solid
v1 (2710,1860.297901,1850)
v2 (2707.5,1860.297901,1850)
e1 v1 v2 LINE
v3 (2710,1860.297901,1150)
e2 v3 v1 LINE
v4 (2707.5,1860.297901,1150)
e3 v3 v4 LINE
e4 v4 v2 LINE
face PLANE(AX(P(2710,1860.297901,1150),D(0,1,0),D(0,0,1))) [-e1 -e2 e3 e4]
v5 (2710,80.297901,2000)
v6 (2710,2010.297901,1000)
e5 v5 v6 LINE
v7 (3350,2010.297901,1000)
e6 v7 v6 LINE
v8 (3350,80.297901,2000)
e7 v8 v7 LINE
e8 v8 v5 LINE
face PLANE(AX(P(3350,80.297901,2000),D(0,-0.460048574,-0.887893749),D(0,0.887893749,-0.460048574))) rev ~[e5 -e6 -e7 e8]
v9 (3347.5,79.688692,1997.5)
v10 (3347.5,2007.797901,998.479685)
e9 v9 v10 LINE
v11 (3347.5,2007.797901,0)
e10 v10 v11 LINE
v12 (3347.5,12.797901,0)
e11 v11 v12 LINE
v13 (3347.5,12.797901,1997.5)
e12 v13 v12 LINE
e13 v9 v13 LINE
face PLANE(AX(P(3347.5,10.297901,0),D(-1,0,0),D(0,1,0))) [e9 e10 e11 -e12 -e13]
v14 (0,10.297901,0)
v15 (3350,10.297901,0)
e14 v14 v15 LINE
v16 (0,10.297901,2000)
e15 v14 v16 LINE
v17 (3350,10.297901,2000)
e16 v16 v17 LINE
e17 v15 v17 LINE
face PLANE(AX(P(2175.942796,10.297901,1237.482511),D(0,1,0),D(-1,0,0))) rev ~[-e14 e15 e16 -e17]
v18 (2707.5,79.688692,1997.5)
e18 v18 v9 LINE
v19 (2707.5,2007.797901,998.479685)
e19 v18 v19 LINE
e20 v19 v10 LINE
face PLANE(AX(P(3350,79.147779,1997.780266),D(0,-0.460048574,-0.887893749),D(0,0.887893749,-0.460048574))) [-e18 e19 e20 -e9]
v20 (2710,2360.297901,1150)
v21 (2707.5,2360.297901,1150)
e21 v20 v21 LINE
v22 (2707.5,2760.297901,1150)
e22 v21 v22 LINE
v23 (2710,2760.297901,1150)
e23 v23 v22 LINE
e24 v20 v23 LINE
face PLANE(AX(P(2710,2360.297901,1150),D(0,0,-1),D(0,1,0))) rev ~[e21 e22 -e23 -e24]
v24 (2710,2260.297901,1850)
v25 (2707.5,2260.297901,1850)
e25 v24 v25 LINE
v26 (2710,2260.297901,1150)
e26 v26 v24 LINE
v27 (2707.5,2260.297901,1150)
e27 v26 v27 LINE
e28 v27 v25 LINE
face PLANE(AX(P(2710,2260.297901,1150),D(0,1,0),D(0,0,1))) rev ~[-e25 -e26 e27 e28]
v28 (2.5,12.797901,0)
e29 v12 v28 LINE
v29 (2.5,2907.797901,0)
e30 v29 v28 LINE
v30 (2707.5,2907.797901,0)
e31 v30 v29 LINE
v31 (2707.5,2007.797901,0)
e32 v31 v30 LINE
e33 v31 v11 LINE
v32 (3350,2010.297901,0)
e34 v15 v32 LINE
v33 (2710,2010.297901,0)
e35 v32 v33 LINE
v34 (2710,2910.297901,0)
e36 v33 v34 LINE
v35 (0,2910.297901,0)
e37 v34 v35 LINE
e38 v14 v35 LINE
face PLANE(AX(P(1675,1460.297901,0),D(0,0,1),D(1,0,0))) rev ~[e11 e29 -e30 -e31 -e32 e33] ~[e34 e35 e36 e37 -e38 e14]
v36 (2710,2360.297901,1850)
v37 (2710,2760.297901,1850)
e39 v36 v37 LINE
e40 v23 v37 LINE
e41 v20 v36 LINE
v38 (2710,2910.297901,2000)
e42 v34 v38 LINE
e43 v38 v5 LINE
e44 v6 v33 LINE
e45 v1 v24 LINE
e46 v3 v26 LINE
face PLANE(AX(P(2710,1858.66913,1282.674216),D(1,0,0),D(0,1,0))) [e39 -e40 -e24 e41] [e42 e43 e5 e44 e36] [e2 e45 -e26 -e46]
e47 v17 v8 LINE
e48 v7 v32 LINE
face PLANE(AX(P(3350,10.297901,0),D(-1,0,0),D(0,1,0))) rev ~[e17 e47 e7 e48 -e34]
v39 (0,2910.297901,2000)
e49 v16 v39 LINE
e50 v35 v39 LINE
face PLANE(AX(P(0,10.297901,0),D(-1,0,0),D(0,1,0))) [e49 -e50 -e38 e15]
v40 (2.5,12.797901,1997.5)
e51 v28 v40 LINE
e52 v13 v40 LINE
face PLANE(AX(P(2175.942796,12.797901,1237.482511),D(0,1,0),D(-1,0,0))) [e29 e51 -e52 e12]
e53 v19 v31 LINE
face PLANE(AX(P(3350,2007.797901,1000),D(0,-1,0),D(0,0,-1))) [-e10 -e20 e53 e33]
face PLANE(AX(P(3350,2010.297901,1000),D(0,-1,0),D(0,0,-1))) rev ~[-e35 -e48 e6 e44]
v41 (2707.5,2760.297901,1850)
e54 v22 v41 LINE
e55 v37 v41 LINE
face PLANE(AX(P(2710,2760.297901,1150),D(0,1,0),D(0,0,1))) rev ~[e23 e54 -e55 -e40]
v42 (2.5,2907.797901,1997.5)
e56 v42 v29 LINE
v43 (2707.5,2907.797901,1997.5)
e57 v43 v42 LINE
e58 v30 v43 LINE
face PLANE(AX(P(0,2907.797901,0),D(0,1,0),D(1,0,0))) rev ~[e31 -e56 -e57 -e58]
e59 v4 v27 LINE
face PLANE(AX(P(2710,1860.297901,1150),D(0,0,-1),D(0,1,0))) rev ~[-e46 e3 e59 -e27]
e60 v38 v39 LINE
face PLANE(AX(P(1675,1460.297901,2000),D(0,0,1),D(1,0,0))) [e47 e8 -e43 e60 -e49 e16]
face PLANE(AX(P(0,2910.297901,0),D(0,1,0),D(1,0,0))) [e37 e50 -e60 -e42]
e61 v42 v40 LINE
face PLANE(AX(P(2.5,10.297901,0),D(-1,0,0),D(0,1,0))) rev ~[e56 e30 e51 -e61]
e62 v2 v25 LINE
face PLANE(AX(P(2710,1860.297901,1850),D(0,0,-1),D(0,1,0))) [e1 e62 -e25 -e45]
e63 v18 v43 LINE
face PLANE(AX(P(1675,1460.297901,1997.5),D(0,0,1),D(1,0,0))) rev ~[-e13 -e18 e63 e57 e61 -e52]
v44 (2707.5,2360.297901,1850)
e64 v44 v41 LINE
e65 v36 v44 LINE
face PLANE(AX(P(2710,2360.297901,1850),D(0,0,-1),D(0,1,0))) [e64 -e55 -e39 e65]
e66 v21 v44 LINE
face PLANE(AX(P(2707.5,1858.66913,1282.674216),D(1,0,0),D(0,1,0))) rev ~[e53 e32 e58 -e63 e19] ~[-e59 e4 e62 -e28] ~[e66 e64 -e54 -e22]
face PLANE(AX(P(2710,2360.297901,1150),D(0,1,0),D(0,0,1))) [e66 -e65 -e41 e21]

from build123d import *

# Parameters (mm, degrees)
F0_W      = 3350
F0_H      = 2900
F1_DEPTH  = 2000
F5_DEPTH  = 640
F9_DEPTH  = 2900
F10_T     = -2.5
F11_W     = 400
F11_H     = 700
F12_DEPTH = 2.5


# Not quite as in the source:
# - an extrude ends at something that could not be found from the text; its depth is read off the source's solid
# - a feature of the source that left no trace in its solid (it failed there, or was rolled back) is left out


with BuildPart() as f1:
    # F0 (on Top) → F1 (new body)
    with BuildSketch(Plane.XY):
        with Locations((1675, 1460.2979007226)):
            Rectangle(F0_W, F0_H)
    extrude(amount=F1_DEPTH)

    # F4 (on face) → F5 (cut, through all)
    with BuildSketch(Plane.YZ.offset(3350)):
        Polygon((2910.2979007226, 2000), (80.2979007226, 2000), (2010.2979007226, 1000), (2010.2979007226, 0), (2910.2979007226, 0), (2910.2979007226, 1000), align=None)
    extrude(amount=-F5_DEPTH, mode=Mode.SUBTRACT)

    # F8 (on face) → F9 (join, through all)
    with BuildSketch(Plane(origin=(0, 2910.2979007226, 0), x_dir=(-1, 0, 0), z_dir=(0, 1, 0))):
        Polygon((-2310, 1000), (-1030, 2000), (-2710, 2000), (-2710, 0), (-2310, 0), align=None)
    extrude(amount=-F9_DEPTH)

    # F10
    f10_openings = [f1.faces().sort_by_distance(p)[0] for p in [
        (1589.598971, 1397.271311, 0),
    ]]
    offset(amount=F10_T, openings=f10_openings, kind=Kind.INTERSECTION)

    # F11 (on face) → F12 (cut, through all)
    with BuildSketch(Plane.YZ.offset(2710)):
        with Locations((2560.2979007226, 1500)):
            Rectangle(F11_W, F11_H)
        with Locations((2060.2979007226, 1500)):
            Rectangle(F11_W, F11_H)
    extrude(amount=-F12_DEPTH, mode=Mode.SUBTRACT)


solid = f1.part
